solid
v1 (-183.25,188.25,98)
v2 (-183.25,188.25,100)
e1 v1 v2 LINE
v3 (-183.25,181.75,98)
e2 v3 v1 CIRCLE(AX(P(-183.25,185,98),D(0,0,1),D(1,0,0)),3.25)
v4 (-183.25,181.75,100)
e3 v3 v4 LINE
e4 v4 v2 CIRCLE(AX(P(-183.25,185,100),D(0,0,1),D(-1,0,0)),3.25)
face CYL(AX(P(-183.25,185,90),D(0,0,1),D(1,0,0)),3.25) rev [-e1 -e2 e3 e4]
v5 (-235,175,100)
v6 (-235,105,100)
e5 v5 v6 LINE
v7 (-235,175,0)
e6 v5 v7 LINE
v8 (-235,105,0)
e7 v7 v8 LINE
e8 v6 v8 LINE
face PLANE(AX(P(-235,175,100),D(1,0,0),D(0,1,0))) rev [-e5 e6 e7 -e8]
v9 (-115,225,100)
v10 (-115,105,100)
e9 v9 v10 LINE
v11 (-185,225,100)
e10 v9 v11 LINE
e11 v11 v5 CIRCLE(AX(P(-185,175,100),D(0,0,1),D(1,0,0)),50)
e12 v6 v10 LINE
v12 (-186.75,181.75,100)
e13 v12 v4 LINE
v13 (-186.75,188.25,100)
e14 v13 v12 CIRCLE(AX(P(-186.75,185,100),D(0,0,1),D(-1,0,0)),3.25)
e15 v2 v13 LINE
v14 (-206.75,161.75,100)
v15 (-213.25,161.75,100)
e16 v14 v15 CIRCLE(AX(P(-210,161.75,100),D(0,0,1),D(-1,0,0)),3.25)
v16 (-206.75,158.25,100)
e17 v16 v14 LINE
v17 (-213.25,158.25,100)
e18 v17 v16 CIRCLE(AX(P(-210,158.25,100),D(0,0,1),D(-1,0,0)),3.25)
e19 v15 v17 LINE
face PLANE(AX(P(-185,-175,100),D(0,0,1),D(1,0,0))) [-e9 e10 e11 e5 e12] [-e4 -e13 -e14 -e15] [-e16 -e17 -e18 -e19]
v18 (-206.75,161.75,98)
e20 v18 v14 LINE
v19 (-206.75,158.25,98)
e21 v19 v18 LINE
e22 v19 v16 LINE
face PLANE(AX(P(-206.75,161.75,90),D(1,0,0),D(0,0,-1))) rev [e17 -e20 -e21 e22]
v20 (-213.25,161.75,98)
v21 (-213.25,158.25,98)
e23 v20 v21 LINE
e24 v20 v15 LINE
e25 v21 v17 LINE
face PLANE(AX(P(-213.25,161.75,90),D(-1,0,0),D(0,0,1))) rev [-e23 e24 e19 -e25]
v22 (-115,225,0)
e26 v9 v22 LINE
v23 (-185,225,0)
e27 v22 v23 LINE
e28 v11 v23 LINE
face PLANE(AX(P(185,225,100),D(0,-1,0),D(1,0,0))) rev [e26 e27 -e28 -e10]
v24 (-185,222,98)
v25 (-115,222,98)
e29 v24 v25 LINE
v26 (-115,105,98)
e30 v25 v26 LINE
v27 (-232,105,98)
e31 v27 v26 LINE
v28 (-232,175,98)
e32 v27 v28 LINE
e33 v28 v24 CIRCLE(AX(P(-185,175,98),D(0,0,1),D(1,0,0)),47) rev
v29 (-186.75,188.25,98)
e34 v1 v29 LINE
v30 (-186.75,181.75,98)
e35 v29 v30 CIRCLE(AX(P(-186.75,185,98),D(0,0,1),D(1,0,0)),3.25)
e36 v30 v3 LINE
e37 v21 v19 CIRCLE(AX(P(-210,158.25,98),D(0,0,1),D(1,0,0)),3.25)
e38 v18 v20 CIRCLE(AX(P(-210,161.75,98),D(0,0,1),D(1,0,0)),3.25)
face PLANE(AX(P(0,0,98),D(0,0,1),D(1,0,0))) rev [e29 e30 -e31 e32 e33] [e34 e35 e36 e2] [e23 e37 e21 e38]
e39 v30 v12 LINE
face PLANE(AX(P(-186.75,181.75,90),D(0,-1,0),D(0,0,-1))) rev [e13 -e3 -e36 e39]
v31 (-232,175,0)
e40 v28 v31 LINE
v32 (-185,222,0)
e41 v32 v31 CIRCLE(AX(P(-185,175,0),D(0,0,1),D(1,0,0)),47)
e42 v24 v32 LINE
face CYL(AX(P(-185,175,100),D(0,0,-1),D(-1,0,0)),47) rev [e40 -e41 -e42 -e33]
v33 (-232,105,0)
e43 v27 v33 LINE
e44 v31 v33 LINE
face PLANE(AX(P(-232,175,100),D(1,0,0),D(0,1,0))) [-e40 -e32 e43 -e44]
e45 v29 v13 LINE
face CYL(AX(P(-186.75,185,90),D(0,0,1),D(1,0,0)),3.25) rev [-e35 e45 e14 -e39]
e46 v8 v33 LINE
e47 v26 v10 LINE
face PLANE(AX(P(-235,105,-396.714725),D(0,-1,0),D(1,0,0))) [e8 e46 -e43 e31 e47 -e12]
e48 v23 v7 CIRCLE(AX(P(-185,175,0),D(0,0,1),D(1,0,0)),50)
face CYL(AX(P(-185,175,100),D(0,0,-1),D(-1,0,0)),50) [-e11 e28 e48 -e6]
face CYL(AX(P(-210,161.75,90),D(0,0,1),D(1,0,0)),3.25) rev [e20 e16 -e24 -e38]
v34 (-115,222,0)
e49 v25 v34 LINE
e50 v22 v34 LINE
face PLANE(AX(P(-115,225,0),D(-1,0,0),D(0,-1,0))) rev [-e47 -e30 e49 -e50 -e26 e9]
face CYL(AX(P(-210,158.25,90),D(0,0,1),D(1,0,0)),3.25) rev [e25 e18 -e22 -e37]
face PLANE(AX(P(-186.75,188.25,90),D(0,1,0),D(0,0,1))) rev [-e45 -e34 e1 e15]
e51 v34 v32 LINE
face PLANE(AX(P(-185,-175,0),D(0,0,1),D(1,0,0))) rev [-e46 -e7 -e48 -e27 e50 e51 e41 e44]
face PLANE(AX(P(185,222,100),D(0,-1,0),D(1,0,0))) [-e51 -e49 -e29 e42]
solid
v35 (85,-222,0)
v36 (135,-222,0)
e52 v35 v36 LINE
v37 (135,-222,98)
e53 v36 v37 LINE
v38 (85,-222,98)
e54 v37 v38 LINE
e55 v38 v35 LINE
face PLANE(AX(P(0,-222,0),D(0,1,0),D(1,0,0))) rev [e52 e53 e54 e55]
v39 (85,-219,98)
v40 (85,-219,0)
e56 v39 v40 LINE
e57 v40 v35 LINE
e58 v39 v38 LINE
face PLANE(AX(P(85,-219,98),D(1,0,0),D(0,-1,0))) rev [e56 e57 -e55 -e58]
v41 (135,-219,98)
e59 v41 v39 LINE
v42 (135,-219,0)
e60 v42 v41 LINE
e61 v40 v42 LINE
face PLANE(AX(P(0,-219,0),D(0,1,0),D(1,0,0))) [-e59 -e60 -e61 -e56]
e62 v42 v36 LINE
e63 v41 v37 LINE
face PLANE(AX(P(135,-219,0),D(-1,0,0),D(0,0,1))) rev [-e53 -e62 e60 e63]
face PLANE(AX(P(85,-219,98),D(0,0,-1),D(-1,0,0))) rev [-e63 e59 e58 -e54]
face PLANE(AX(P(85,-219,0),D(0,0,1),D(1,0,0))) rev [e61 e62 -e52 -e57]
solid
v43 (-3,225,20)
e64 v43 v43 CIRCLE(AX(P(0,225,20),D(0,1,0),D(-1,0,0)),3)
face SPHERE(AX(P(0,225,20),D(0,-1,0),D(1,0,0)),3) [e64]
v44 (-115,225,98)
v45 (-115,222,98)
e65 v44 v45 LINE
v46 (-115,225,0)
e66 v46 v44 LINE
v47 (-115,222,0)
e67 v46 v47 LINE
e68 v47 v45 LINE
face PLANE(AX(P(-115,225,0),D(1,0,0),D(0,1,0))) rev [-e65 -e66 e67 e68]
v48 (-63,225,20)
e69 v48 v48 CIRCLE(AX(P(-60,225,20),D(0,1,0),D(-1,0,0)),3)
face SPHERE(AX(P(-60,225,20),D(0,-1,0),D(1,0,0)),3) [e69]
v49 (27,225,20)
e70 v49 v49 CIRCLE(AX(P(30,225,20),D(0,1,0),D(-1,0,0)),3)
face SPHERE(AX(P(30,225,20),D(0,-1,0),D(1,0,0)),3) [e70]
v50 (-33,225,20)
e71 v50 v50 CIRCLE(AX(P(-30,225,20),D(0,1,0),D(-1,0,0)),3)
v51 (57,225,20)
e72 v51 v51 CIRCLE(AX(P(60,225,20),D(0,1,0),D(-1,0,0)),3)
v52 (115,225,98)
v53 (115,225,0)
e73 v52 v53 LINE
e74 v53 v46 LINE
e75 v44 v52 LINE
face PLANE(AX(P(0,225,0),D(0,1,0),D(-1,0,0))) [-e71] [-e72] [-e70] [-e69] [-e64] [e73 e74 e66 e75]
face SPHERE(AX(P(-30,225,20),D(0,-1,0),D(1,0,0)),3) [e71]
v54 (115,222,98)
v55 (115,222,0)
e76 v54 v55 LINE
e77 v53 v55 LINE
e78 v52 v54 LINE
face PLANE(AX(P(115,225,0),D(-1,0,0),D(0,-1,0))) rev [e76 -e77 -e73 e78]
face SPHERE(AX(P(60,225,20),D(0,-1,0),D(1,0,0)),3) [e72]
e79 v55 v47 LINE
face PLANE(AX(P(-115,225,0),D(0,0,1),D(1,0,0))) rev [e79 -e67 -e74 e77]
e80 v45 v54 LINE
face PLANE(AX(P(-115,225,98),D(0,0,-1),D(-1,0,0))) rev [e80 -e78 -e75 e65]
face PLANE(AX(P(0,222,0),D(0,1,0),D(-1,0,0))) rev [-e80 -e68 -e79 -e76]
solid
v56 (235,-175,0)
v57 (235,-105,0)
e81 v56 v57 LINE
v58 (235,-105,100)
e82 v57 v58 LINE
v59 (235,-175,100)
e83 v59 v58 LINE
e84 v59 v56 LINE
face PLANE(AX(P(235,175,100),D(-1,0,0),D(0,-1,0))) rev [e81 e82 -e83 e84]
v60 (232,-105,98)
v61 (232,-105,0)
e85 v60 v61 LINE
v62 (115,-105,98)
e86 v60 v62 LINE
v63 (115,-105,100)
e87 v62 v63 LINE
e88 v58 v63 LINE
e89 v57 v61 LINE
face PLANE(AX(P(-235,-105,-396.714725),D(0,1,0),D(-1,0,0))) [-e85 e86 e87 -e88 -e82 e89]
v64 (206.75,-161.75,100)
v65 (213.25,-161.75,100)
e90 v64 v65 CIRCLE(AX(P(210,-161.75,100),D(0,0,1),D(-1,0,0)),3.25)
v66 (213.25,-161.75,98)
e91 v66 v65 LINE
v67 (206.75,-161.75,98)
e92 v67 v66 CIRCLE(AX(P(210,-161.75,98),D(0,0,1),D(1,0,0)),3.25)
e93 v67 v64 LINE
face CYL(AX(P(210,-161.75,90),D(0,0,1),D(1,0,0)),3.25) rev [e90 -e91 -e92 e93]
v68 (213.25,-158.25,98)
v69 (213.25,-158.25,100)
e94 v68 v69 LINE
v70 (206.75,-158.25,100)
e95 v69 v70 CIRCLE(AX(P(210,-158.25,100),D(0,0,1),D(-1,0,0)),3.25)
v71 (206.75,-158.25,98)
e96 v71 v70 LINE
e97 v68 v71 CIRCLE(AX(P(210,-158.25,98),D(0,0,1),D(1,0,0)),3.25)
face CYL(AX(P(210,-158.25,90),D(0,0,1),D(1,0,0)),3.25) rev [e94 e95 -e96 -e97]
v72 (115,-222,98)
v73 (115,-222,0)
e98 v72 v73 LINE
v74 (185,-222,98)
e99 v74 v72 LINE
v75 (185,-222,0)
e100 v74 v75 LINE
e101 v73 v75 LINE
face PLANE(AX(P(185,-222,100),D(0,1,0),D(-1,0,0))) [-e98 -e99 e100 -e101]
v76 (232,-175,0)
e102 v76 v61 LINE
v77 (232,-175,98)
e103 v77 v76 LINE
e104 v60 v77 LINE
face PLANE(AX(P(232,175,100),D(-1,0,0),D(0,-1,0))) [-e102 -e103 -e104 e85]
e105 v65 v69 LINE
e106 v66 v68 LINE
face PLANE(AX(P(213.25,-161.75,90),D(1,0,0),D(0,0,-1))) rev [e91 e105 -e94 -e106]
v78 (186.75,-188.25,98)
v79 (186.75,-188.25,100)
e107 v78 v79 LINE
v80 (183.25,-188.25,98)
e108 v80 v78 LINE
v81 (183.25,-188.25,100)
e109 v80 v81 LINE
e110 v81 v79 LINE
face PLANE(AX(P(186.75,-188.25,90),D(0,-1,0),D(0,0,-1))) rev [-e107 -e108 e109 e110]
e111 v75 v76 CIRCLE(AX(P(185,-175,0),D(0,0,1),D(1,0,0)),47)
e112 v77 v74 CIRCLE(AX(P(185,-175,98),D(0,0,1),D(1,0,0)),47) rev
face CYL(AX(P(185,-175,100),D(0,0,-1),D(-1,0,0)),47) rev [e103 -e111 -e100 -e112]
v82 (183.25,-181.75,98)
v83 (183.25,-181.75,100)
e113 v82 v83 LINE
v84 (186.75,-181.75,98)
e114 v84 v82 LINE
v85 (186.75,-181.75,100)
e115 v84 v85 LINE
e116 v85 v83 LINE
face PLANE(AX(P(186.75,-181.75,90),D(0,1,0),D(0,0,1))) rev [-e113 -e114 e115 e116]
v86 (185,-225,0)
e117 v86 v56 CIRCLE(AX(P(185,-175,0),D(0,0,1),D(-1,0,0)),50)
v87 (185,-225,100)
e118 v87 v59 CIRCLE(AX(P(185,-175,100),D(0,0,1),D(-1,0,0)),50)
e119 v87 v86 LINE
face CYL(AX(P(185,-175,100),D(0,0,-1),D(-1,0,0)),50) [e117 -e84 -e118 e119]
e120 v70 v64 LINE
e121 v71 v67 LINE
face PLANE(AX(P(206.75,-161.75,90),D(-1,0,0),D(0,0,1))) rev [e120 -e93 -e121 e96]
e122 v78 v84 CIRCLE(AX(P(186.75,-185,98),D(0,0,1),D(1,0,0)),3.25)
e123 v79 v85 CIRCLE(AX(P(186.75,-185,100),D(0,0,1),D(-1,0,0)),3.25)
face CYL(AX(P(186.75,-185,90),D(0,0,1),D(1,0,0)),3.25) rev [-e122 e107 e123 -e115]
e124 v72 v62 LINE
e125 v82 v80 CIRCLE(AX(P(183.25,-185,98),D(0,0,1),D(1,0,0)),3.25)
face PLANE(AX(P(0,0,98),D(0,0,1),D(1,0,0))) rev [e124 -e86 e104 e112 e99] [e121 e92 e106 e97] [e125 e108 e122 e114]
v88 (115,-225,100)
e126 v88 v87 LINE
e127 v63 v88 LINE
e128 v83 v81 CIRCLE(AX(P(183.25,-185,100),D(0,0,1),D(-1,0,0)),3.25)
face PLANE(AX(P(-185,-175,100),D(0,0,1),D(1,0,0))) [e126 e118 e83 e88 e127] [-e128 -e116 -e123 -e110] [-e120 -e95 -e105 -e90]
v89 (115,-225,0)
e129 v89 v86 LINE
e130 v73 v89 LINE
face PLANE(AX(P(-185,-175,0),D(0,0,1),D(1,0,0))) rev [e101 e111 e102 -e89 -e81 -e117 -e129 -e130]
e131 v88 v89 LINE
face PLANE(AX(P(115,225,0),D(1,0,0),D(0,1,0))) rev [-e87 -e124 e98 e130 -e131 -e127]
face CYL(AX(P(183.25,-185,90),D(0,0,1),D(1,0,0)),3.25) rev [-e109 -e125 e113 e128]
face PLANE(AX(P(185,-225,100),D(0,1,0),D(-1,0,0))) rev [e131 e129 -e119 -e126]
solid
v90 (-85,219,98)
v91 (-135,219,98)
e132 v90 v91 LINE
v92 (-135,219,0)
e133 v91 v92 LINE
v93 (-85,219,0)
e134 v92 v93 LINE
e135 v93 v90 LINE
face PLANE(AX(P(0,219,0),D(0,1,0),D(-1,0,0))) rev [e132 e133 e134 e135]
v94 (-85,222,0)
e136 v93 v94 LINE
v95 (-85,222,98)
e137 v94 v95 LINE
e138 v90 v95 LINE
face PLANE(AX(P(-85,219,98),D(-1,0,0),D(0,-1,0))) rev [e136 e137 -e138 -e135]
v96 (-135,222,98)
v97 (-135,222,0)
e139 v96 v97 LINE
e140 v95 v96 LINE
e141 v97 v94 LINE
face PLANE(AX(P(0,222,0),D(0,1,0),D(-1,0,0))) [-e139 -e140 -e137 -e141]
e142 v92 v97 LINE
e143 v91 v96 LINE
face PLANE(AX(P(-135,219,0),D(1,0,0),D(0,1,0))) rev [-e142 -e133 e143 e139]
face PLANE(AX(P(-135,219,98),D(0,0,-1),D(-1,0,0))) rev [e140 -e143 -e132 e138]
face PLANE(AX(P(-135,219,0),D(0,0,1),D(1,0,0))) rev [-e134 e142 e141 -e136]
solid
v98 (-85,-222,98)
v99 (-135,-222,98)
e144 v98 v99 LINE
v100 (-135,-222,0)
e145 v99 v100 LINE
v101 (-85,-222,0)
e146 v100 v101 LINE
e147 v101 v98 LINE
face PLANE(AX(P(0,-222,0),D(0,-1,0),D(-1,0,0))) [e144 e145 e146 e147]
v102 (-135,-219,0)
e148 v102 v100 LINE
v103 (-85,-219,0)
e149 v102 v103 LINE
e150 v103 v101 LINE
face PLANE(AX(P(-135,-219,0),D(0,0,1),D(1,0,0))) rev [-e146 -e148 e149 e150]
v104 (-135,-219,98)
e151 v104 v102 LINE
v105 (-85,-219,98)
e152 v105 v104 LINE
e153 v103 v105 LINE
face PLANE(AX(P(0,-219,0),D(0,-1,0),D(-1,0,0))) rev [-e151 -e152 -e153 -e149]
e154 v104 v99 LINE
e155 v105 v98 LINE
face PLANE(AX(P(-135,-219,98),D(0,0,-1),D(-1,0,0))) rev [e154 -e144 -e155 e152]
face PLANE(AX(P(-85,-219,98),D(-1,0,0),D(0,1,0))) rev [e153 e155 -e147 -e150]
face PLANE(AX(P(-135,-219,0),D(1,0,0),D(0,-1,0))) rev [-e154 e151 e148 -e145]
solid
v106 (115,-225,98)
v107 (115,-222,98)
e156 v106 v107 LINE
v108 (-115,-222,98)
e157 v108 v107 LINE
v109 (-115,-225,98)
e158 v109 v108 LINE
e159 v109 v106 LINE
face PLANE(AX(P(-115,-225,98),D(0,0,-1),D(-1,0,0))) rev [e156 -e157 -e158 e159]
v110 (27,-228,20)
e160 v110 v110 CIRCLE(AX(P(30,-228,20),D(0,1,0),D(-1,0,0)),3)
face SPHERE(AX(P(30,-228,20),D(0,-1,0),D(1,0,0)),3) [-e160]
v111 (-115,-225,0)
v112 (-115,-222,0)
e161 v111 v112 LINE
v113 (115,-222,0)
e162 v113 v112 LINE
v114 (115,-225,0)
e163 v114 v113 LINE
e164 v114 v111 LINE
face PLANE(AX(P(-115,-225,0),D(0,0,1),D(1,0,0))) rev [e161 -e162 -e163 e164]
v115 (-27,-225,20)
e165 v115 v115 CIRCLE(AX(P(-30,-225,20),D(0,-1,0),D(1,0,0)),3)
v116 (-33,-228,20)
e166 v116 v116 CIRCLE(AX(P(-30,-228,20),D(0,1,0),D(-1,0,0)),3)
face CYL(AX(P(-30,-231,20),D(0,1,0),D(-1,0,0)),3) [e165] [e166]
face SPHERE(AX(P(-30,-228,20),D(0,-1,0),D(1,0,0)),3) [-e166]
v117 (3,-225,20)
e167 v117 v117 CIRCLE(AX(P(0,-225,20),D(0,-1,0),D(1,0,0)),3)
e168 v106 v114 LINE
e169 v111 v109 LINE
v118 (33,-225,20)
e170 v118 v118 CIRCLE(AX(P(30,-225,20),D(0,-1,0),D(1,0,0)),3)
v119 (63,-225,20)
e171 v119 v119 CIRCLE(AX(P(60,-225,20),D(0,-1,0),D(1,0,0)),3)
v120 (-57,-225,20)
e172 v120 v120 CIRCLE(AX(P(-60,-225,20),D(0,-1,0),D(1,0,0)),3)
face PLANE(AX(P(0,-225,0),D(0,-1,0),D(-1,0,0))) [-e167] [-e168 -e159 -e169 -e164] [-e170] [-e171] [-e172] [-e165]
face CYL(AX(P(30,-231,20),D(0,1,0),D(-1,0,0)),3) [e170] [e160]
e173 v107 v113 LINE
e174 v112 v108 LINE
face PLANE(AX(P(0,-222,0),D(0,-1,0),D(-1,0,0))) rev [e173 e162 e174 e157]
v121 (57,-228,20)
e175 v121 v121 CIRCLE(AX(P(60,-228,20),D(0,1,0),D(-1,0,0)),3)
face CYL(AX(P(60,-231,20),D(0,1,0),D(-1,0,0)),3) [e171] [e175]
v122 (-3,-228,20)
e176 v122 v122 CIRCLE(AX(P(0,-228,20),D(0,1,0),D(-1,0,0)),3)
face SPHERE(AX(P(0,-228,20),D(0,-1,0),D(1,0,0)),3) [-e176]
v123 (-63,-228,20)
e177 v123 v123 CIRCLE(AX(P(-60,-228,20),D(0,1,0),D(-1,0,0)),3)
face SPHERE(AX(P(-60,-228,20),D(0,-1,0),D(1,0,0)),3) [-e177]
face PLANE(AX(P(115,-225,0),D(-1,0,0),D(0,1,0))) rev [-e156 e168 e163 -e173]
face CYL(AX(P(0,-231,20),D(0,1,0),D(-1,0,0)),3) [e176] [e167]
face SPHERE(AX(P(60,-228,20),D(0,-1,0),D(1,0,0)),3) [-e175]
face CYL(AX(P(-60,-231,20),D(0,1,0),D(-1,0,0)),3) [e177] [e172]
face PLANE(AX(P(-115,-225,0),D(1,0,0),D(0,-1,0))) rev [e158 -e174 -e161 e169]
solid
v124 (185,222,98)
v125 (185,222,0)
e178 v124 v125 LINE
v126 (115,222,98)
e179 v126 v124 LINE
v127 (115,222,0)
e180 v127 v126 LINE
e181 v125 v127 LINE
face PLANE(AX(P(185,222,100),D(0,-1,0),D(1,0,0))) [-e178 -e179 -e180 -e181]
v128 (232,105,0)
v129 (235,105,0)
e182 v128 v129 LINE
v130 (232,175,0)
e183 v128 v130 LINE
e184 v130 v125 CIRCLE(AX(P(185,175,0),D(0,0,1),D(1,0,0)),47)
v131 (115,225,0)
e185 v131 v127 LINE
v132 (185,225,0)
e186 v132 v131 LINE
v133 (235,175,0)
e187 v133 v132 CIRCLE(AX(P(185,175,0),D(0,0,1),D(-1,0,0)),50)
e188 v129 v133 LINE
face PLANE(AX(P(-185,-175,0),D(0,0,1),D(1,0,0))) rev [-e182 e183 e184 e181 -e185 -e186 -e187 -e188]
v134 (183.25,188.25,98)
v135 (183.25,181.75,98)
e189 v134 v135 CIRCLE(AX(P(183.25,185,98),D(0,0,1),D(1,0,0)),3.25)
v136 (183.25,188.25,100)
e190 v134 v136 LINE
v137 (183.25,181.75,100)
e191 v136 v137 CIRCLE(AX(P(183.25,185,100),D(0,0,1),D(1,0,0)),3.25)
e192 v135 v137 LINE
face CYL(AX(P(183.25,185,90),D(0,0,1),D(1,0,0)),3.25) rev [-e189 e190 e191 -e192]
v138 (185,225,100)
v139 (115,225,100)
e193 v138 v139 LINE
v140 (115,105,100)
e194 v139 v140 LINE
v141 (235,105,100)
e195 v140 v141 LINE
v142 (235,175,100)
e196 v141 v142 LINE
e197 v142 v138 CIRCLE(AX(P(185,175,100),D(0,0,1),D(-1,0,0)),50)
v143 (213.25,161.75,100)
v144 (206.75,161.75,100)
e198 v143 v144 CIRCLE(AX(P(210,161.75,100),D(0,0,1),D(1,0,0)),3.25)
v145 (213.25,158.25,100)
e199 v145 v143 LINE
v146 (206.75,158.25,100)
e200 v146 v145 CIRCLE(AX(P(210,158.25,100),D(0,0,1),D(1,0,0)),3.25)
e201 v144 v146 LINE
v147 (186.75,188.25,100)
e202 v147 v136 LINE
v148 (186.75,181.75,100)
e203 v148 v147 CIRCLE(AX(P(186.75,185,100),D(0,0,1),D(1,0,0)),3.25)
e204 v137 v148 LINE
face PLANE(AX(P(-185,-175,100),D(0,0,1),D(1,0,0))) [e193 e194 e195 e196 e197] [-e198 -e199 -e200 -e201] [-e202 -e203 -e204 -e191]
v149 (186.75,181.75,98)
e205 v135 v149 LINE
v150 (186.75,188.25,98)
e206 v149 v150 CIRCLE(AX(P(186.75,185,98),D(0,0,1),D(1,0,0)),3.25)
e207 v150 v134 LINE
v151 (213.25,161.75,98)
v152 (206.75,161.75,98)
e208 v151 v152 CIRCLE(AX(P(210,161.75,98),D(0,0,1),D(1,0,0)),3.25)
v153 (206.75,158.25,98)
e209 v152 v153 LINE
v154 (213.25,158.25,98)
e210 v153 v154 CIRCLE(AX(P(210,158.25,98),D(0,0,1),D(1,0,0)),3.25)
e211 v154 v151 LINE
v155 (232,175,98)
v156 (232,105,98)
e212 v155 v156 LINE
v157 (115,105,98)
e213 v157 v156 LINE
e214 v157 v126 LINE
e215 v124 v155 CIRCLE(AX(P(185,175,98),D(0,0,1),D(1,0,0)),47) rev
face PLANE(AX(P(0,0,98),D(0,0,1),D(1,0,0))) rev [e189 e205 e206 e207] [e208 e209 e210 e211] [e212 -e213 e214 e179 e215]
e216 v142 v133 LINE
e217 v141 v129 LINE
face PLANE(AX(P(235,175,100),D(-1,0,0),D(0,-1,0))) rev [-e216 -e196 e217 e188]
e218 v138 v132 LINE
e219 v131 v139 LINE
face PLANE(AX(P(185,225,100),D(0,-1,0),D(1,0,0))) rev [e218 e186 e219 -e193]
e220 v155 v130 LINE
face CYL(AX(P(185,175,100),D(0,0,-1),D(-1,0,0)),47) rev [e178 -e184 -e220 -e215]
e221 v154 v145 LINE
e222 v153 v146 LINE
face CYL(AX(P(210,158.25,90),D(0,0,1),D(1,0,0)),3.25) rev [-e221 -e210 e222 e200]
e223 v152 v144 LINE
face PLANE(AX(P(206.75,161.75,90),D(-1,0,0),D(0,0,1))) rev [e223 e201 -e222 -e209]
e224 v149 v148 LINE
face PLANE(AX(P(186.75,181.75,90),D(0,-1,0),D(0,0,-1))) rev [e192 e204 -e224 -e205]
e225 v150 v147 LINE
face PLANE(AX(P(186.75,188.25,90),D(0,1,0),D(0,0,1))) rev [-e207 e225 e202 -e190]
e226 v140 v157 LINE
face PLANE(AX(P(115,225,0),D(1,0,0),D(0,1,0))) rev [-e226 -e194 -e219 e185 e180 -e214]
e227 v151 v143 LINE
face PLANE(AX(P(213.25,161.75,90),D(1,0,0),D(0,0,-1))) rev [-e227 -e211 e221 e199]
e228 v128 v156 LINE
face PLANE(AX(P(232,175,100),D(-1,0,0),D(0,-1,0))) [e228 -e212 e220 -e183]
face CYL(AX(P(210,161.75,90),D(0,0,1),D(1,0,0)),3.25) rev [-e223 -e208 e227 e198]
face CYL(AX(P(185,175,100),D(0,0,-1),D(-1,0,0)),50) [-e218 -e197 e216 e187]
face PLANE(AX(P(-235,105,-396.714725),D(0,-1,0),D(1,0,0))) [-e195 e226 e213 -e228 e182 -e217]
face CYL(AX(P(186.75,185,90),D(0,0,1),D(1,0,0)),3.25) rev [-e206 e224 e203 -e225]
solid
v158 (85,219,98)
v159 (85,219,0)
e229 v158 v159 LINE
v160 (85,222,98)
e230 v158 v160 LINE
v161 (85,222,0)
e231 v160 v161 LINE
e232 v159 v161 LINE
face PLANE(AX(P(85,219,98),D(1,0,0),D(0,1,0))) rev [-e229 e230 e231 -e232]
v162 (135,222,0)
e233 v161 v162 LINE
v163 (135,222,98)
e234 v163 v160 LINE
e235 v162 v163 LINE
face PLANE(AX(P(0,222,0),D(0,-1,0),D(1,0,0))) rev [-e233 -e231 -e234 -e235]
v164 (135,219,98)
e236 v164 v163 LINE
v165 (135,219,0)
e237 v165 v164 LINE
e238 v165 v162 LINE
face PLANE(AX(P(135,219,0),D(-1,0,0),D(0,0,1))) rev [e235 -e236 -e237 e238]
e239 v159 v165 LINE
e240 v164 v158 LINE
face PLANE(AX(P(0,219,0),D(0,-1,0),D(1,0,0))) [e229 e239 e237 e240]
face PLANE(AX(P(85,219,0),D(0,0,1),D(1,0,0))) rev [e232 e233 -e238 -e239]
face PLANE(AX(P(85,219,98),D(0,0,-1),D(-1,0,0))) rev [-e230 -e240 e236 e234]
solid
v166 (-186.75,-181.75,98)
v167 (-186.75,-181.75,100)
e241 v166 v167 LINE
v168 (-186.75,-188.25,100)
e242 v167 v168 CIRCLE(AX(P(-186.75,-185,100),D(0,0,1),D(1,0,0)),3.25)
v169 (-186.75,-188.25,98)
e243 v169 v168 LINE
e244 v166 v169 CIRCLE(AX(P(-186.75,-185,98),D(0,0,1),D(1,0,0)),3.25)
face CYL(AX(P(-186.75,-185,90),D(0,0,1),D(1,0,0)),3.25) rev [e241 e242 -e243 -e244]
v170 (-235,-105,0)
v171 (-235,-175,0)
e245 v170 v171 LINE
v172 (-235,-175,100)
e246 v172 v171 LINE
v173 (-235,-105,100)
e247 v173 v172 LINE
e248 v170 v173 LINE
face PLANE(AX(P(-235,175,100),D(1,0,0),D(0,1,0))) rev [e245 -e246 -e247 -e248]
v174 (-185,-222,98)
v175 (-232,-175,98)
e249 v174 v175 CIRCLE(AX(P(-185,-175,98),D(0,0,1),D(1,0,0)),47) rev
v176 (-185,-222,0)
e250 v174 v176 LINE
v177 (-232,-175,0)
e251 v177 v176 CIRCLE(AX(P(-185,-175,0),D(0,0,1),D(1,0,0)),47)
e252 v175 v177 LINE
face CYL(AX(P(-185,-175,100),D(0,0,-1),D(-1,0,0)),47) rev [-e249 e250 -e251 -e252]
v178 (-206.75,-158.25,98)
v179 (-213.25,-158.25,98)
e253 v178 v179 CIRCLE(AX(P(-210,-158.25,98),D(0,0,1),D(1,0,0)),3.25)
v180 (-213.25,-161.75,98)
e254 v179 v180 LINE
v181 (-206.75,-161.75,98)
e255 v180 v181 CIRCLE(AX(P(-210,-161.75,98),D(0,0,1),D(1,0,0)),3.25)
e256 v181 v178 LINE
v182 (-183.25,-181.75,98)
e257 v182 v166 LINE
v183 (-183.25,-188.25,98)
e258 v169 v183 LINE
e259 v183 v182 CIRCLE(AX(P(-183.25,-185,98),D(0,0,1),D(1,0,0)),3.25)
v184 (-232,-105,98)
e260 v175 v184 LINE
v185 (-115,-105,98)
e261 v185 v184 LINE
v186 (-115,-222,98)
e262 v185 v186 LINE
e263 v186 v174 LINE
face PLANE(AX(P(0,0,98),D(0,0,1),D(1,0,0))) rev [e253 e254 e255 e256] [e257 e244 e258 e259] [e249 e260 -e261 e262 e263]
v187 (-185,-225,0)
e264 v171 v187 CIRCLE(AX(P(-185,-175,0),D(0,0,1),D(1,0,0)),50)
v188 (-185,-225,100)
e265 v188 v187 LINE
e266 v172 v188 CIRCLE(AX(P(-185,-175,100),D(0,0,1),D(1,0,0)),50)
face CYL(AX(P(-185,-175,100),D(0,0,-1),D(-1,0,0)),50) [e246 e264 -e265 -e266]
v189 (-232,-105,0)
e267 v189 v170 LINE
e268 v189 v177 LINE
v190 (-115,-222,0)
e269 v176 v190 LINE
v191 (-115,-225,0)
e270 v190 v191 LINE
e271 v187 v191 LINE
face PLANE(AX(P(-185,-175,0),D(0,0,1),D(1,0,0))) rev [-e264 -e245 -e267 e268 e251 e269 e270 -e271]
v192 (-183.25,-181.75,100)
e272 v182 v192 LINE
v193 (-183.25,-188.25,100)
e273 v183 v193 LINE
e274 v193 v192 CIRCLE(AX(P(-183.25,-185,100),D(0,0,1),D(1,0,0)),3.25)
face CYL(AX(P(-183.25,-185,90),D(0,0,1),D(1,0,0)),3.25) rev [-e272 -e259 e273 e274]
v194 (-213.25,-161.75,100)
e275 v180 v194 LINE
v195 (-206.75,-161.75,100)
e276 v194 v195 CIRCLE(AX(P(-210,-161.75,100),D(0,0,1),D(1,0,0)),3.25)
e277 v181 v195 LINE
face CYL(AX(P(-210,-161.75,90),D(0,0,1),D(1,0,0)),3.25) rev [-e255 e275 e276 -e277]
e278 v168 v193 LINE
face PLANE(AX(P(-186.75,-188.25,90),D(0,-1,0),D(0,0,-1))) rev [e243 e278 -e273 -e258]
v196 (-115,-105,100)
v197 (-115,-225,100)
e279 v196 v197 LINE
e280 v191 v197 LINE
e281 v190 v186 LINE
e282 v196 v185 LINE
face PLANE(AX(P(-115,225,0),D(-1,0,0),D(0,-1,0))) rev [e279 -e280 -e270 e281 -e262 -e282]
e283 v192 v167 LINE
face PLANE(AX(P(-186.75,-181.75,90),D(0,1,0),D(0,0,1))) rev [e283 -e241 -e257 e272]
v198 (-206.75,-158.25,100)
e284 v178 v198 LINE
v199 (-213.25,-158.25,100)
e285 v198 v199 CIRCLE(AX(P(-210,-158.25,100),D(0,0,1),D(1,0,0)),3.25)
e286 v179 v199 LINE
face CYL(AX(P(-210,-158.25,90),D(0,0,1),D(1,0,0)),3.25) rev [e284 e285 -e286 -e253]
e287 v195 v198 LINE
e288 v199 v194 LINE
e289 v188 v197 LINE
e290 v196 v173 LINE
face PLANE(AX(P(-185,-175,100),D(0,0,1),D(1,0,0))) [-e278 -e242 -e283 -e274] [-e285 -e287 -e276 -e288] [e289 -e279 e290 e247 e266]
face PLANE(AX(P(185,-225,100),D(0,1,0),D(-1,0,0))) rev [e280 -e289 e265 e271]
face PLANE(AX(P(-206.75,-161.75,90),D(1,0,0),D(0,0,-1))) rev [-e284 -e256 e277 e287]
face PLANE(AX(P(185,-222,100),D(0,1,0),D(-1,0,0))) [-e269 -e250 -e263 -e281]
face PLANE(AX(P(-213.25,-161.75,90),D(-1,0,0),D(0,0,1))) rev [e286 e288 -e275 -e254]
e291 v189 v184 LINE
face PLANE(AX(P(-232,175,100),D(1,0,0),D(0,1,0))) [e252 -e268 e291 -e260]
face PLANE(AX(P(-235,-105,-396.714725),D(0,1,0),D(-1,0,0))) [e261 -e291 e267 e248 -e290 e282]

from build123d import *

# Parameters (mm, degrees)
EXTRUDE_THIN1_DEPTH     = 100
BOSS_EXTRUDE1_START     = -2
BOSS_EXTRUDE1_DEPTH     = 2
CUT_EXTRUDE3_DEPTH      = 10
CUT_EXTRUDE4_DEPTH      = 518.421491629
CUT_EXTRUDE4_DEPTH_BACK = 518.421491629
SKETCH7_W               = 230
SKETCH7_H               = 100
CUT_EXTRUDE5_DEPTH      = 535.906533892
CUT_EXTRUDE5_DEPTH_BACK = 535.906533892
SKETCH5_W               = 210
SKETCH5_H               = 554.388763444
SKETCH9_W               = 50
SKETCH9_H               = 98
BOSS_EXTRUDE2_DEPTH     = 3
BOSS_EXTRUDE2_2_DEPTH   = 3
SKETCH10_W              = 230
SKETCH10_H              = 98
BOSS_EXTRUDE3_DEPTH     = 3
SKETCH11_R              = 3
BOSS_EXTRUDE4_DEPTH     = 6
FILLET1_R               = 3
SKETCH12_R              = 3
BOSS_EXTRUDE5_DEPTH     = 6
FILLET2_R               = 3


with BuildPart() as part:
    # Sketch1 → Extrude-Thin1 (new body)
    with BuildSketch(Plane.XY):
        with BuildLine():
            Line((-235, 175), (-235, -175))
            ThreePointArc((-235, -175), (-220.355339059, -210.355339059), (-185, -225))
            Line((-185, -225), (185, -225))
            ThreePointArc((185, -225), (220.355339059, -210.355339059), (235, -175))
            Line((235, -175), (235, 175))
            ThreePointArc((235, 175), (220.355339059, 210.355339059), (185, 225))
            Line((185, 225), (-185, 225))
            ThreePointArc((-185, 225), (-220.355339059, 210.355339059), (-235, 175))
        make_face()
        with BuildLine():
            Line((-232, 175), (-232, -175))
            ThreePointArc((-232, -175), (-218.234018716, -208.234018716), (-185, -222))
            Line((-185, -222), (185, -222))
            ThreePointArc((185, -222), (218.234018716, -208.234018716), (232, -175))
            Line((232, -175), (232, 175))
            ThreePointArc((232, 175), (218.234018716, 208.234018716), (185, 222))
            Line((185, 222), (-185, 222))
            ThreePointArc((-185, 222), (-218.234018716, 208.234018716), (-232, 175))
        make_face(mode=Mode.SUBTRACT)
    extrude(amount=EXTRUDE_THIN1_DEPTH)

    # Sketch2 → Boss-Extrude1 (add)
    with BuildSketch(Plane.XY.offset(100).offset(BOSS_EXTRUDE1_START)):
        with BuildLine():
            Line((0, -222), (0, 222))
            Line((0, 222), (-185, 222))
            ThreePointArc((-185, 222), (-218.234018716, 208.234018716), (-232, 175))
            Line((-232, 175), (-232, -175))
            ThreePointArc((-232, -175), (-218.234018716, -208.234018716), (-185, -222))
            Line((-185, -222), (0, -222))
        make_face()
        with BuildLine():
            Line((185, 222), (0, 222))
            Line((0, 222), (0, -222))
            Line((0, -222), (185, -222))
            ThreePointArc((185, -222), (218.234018716, -208.234018716), (232, -175))
            Line((232, -175), (232, 175))
            ThreePointArc((232, 175), (218.234018716, 208.234018716), (185, 222))
        make_face()
    extrude(amount=BOSS_EXTRUDE1_DEPTH)

    # Sketch6 → Cut-Extrude3 (cut)
    with BuildSketch(Plane.XY.offset(100)):
        with BuildLine():
            Line((-186.75, -181.75), (-183.25, -181.75))
            ThreePointArc((-183.25, -181.75), (-180, -185), (-183.25, -188.25))
            Line((-183.25, -188.25), (-186.75, -188.25))
            ThreePointArc((-186.75, -188.25), (-190, -185), (-186.75, -181.75))
        make_face()
        with BuildLine():
            Line((-213.25, -161.75), (-213.25, -158.25))
            ThreePointArc((-213.25, -158.25), (-210, -155), (-206.75, -158.25))
            Line((-206.75, -158.25), (-206.75, -161.75))
            ThreePointArc((-206.75, -161.75), (-210, -165), (-213.25, -161.75))
        make_face()
        with BuildLine():
            Line((206.75, -161.75), (206.75, -158.25))
            ThreePointArc((206.75, -158.25), (210, -155), (213.25, -158.25))
            Line((213.25, -158.25), (213.25, -161.75))
            ThreePointArc((213.25, -161.75), (210, -165), (206.75, -161.75))
        make_face()
        with BuildLine():
            Line((186.75, -188.25), (183.25, -188.25))
            ThreePointArc((183.25, -188.25), (180, -185), (183.25, -181.75))
            Line((183.25, -181.75), (186.75, -181.75))
            ThreePointArc((186.75, -181.75), (190, -185), (186.75, -188.25))
        make_face()
        with BuildLine():
            Line((186.75, 181.75), (183.25, 181.75))
            ThreePointArc((183.25, 181.75), (180, 185), (183.25, 188.25))
            Line((183.25, 188.25), (186.75, 188.25))
            ThreePointArc((186.75, 188.25), (190, 185), (186.75, 181.75))
        make_face()
        with BuildLine():
            Line((213.25, 161.75), (213.25, 158.25))
            ThreePointArc((213.25, 158.25), (210, 155), (206.75, 158.25))
            Line((206.75, 158.25), (206.75, 161.75))
            ThreePointArc((206.75, 161.75), (210, 165), (213.25, 161.75))
        make_face()
        with BuildLine():
            Line((-206.75, 161.75), (-206.75, 158.25))
            ThreePointArc((-206.75, 158.25), (-210, 155), (-213.25, 158.25))
            Line((-213.25, 158.25), (-213.25, 161.75))
            ThreePointArc((-213.25, 161.75), (-210, 165), (-206.75, 161.75))
        make_face()
        with BuildLine():
            Line((-186.75, 188.25), (-183.25, 188.25))
            ThreePointArc((-183.25, 188.25), (-180, 185), (-183.25, 181.75))
            Line((-183.25, 181.75), (-186.75, 181.75))
            ThreePointArc((-186.75, 181.75), (-190, 185), (-186.75, 188.25))
        make_face()
    extrude(amount=-CUT_EXTRUDE3_DEPTH, mode=Mode.SUBTRACT)

    # Sketch7 → Cut-Extrude4 (cut, two sides: drawn at the far end of the back side and taken through both)
    with BuildSketch(Plane.XZ.offset(225).offset(-CUT_EXTRUDE4_DEPTH_BACK)):
        with Locations((0, 50)):
            Rectangle(SKETCH7_W, SKETCH7_H)
    extrude(amount=CUT_EXTRUDE4_DEPTH + CUT_EXTRUDE4_DEPTH_BACK, mode=Mode.SUBTRACT)


with BuildPart() as cut_extrude4_piece_1:
    # of the separate pieces the step leaves, piece 1, a body of its own (cut_extrude4_pieces)
    add(part.part.solids().sort_by_distance((-235, 175, 0))[0])


with BuildPart() as cut_extrude4_piece_2:
    # of the separate pieces the step leaves, piece 2, a body of its own (cut_extrude4_pieces)
    add(part.part.solids().sort_by_distance((185, 225, 0))[0])


with BuildPart() as cut_extrude5_tool:
    # Sketch5 → Cut-Extrude5 (new, two sides: drawn at the far end of the back side and taken through both)
    with BuildSketch(Plane(origin=(235, -10, 0), x_dir=(0, -1, 0), z_dir=(-1, 0, 0)).offset(-CUT_EXTRUDE5_DEPTH_BACK)):
        with Locations((-10, -119.520343504)):
            Rectangle(SKETCH5_W, SKETCH5_H)
    extrude(amount=CUT_EXTRUDE5_DEPTH + CUT_EXTRUDE5_DEPTH_BACK)


with BuildPart() as cut_extrude4_piece_1_1:
    add(cut_extrude4_piece_1.part)

    # Cut-Extrude5: cut by cut_extrude5_tool
    add(cut_extrude5_tool.part, mode=Mode.SUBTRACT)


with BuildPart() as cut_extrude4_piece_2_1:
    add(cut_extrude4_piece_2.part)

    # Cut-Extrude5: cut by cut_extrude5_tool
    add(cut_extrude5_tool.part, mode=Mode.SUBTRACT)


with BuildPart() as cut_extrude5_piece_1:
    # of the separate pieces the step leaves, piece 1, a body of its own (cut_extrude5_pieces)
    add(cut_extrude4_piece_1_1.part.solids().sort_by_distance((-235, -105, 0))[0])


with BuildPart() as cut_extrude5_piece_2:
    # of the separate pieces the step leaves, piece 2, a body of its own (cut_extrude5_pieces)
    add(cut_extrude4_piece_1_1.part.solids().sort_by_distance((-235, 175, 0))[0])


with BuildPart() as cut_extrude5_piece_1_of_cut_extrude4_pie:
    # of the separate pieces the step leaves, piece 1, a body of its own (cut_extrude5_pieces_of_cut_extrude4_piec)
    add(cut_extrude4_piece_2_1.part.solids().sort_by_distance((235, -175, 0))[0])


with BuildPart() as cut_extrude5_piece_2_of_cut_extrude4_pie:
    # of the separate pieces the step leaves, piece 2, a body of its own (cut_extrude5_pieces_of_cut_extrude4_piec)
    add(cut_extrude4_piece_2_1.part.solids().sort_by_distance((235, 175, 0))[0])


with BuildPart() as body_5:
    # Sketch9 → Boss-Extrude2 (new body)
    with BuildSketch(Plane.XZ.offset(-222)):
        with Locations((-110, 49)):
            Rectangle(SKETCH9_W, SKETCH9_H)
    extrude(amount=BOSS_EXTRUDE2_DEPTH)


with BuildPart() as body_6:
    # Sketch9 → Boss-Extrude2 2 (new body)
    with BuildSketch(Plane.XZ.offset(-222)):
        with Locations((110, 49)):
            Rectangle(SKETCH9_W, SKETCH9_H)
    extrude(amount=BOSS_EXTRUDE2_2_DEPTH)


with BuildPart() as body_7:
    # Sketch10 → Boss-Extrude3 (new body)
    with BuildSketch(Plane(origin=(0, 222, 0), x_dir=(1, 0, 0), z_dir=(0, 1, 0))):
        with Locations((0, -49)):
            Rectangle(SKETCH10_W, SKETCH10_H)
    extrude(amount=BOSS_EXTRUDE3_DEPTH)


with BuildPart() as body_8:
    # Mirror2: mirrored copy
    add(body_5.part.mirror(Plane.ZX))


with BuildPart() as body_9:
    # Mirror2 2: mirrored copy
    add(body_6.part.mirror(Plane.ZX))


with BuildPart() as body_10:
    # Mirror2 3: mirrored copy
    add(body_7.part.mirror(Plane.ZX))

    # Sketch11 → Boss-Extrude4 (add)
    with BuildSketch(Plane.XZ.offset(225)):
        with Locations((-60, 20)):
            Circle(SKETCH11_R)
        with Locations((60, 20)):
            Circle(SKETCH11_R)
        with Locations((0, 20)):
            Circle(SKETCH11_R)
        with Locations((-30, 20)):
            Circle(SKETCH11_R)
        with Locations((30, 20)):
            Circle(SKETCH11_R)
    extrude(amount=BOSS_EXTRUDE4_DEPTH)

    # Fillet1
    fillet1_edges = [body_10.edges().sort_by_distance(p)[0] for p in [
        (-63, -231, 20),
        (57, -231, 20),
        (-3, -231, 20),
        (-33, -231, 20),
        (27, -231, 20),
    ]]
    fillet(fillet1_edges, radius=FILLET1_R)


with BuildPart() as body_7_1:
    add(body_7.part)

    # Sketch12 → Boss-Extrude5 (add)
    with BuildSketch(Plane.XZ.offset(-222)):
        with Locations(Location((-60, 20, 0), (0, 0, 180))):
            Circle(SKETCH12_R)
        with Locations(Location((60, 20, 0), (0, 0, 180))):
            Circle(SKETCH12_R)
        with Locations(Location((30, 20, 0), (0, 0, 180))):
            Circle(SKETCH12_R)
        with Locations(Location((0, 20, 0), (0, 0, 180))):
            Circle(SKETCH12_R)
        with Locations(Location((-30, 20, 0), (0, 0, 180))):
            Circle(SKETCH12_R)
    extrude(amount=-BOSS_EXTRUDE5_DEPTH)

    # Fillet2
    fillet2_edges = [body_7_1.edges().sort_by_distance(p)[0] for p in [
        (-57, 228, 20),
        (63, 228, 20),
        (33, 228, 20),
        (3, 228, 20),
        (-27, 228, 20),
    ]]
    fillet(fillet2_edges, radius=FILLET2_R - 0.0001)  # a hair under: the kernel refuses the full size


solid = Compound([cut_extrude5_piece_1.part, cut_extrude5_piece_2.part, cut_extrude5_piece_1_of_cut_extrude4_pie.part, cut_extrude5_piece_2_of_cut_extrude4_pie.part, body_5.part, body_6.part, body_8.part, body_9.part, body_10.part, body_7_1.part])
